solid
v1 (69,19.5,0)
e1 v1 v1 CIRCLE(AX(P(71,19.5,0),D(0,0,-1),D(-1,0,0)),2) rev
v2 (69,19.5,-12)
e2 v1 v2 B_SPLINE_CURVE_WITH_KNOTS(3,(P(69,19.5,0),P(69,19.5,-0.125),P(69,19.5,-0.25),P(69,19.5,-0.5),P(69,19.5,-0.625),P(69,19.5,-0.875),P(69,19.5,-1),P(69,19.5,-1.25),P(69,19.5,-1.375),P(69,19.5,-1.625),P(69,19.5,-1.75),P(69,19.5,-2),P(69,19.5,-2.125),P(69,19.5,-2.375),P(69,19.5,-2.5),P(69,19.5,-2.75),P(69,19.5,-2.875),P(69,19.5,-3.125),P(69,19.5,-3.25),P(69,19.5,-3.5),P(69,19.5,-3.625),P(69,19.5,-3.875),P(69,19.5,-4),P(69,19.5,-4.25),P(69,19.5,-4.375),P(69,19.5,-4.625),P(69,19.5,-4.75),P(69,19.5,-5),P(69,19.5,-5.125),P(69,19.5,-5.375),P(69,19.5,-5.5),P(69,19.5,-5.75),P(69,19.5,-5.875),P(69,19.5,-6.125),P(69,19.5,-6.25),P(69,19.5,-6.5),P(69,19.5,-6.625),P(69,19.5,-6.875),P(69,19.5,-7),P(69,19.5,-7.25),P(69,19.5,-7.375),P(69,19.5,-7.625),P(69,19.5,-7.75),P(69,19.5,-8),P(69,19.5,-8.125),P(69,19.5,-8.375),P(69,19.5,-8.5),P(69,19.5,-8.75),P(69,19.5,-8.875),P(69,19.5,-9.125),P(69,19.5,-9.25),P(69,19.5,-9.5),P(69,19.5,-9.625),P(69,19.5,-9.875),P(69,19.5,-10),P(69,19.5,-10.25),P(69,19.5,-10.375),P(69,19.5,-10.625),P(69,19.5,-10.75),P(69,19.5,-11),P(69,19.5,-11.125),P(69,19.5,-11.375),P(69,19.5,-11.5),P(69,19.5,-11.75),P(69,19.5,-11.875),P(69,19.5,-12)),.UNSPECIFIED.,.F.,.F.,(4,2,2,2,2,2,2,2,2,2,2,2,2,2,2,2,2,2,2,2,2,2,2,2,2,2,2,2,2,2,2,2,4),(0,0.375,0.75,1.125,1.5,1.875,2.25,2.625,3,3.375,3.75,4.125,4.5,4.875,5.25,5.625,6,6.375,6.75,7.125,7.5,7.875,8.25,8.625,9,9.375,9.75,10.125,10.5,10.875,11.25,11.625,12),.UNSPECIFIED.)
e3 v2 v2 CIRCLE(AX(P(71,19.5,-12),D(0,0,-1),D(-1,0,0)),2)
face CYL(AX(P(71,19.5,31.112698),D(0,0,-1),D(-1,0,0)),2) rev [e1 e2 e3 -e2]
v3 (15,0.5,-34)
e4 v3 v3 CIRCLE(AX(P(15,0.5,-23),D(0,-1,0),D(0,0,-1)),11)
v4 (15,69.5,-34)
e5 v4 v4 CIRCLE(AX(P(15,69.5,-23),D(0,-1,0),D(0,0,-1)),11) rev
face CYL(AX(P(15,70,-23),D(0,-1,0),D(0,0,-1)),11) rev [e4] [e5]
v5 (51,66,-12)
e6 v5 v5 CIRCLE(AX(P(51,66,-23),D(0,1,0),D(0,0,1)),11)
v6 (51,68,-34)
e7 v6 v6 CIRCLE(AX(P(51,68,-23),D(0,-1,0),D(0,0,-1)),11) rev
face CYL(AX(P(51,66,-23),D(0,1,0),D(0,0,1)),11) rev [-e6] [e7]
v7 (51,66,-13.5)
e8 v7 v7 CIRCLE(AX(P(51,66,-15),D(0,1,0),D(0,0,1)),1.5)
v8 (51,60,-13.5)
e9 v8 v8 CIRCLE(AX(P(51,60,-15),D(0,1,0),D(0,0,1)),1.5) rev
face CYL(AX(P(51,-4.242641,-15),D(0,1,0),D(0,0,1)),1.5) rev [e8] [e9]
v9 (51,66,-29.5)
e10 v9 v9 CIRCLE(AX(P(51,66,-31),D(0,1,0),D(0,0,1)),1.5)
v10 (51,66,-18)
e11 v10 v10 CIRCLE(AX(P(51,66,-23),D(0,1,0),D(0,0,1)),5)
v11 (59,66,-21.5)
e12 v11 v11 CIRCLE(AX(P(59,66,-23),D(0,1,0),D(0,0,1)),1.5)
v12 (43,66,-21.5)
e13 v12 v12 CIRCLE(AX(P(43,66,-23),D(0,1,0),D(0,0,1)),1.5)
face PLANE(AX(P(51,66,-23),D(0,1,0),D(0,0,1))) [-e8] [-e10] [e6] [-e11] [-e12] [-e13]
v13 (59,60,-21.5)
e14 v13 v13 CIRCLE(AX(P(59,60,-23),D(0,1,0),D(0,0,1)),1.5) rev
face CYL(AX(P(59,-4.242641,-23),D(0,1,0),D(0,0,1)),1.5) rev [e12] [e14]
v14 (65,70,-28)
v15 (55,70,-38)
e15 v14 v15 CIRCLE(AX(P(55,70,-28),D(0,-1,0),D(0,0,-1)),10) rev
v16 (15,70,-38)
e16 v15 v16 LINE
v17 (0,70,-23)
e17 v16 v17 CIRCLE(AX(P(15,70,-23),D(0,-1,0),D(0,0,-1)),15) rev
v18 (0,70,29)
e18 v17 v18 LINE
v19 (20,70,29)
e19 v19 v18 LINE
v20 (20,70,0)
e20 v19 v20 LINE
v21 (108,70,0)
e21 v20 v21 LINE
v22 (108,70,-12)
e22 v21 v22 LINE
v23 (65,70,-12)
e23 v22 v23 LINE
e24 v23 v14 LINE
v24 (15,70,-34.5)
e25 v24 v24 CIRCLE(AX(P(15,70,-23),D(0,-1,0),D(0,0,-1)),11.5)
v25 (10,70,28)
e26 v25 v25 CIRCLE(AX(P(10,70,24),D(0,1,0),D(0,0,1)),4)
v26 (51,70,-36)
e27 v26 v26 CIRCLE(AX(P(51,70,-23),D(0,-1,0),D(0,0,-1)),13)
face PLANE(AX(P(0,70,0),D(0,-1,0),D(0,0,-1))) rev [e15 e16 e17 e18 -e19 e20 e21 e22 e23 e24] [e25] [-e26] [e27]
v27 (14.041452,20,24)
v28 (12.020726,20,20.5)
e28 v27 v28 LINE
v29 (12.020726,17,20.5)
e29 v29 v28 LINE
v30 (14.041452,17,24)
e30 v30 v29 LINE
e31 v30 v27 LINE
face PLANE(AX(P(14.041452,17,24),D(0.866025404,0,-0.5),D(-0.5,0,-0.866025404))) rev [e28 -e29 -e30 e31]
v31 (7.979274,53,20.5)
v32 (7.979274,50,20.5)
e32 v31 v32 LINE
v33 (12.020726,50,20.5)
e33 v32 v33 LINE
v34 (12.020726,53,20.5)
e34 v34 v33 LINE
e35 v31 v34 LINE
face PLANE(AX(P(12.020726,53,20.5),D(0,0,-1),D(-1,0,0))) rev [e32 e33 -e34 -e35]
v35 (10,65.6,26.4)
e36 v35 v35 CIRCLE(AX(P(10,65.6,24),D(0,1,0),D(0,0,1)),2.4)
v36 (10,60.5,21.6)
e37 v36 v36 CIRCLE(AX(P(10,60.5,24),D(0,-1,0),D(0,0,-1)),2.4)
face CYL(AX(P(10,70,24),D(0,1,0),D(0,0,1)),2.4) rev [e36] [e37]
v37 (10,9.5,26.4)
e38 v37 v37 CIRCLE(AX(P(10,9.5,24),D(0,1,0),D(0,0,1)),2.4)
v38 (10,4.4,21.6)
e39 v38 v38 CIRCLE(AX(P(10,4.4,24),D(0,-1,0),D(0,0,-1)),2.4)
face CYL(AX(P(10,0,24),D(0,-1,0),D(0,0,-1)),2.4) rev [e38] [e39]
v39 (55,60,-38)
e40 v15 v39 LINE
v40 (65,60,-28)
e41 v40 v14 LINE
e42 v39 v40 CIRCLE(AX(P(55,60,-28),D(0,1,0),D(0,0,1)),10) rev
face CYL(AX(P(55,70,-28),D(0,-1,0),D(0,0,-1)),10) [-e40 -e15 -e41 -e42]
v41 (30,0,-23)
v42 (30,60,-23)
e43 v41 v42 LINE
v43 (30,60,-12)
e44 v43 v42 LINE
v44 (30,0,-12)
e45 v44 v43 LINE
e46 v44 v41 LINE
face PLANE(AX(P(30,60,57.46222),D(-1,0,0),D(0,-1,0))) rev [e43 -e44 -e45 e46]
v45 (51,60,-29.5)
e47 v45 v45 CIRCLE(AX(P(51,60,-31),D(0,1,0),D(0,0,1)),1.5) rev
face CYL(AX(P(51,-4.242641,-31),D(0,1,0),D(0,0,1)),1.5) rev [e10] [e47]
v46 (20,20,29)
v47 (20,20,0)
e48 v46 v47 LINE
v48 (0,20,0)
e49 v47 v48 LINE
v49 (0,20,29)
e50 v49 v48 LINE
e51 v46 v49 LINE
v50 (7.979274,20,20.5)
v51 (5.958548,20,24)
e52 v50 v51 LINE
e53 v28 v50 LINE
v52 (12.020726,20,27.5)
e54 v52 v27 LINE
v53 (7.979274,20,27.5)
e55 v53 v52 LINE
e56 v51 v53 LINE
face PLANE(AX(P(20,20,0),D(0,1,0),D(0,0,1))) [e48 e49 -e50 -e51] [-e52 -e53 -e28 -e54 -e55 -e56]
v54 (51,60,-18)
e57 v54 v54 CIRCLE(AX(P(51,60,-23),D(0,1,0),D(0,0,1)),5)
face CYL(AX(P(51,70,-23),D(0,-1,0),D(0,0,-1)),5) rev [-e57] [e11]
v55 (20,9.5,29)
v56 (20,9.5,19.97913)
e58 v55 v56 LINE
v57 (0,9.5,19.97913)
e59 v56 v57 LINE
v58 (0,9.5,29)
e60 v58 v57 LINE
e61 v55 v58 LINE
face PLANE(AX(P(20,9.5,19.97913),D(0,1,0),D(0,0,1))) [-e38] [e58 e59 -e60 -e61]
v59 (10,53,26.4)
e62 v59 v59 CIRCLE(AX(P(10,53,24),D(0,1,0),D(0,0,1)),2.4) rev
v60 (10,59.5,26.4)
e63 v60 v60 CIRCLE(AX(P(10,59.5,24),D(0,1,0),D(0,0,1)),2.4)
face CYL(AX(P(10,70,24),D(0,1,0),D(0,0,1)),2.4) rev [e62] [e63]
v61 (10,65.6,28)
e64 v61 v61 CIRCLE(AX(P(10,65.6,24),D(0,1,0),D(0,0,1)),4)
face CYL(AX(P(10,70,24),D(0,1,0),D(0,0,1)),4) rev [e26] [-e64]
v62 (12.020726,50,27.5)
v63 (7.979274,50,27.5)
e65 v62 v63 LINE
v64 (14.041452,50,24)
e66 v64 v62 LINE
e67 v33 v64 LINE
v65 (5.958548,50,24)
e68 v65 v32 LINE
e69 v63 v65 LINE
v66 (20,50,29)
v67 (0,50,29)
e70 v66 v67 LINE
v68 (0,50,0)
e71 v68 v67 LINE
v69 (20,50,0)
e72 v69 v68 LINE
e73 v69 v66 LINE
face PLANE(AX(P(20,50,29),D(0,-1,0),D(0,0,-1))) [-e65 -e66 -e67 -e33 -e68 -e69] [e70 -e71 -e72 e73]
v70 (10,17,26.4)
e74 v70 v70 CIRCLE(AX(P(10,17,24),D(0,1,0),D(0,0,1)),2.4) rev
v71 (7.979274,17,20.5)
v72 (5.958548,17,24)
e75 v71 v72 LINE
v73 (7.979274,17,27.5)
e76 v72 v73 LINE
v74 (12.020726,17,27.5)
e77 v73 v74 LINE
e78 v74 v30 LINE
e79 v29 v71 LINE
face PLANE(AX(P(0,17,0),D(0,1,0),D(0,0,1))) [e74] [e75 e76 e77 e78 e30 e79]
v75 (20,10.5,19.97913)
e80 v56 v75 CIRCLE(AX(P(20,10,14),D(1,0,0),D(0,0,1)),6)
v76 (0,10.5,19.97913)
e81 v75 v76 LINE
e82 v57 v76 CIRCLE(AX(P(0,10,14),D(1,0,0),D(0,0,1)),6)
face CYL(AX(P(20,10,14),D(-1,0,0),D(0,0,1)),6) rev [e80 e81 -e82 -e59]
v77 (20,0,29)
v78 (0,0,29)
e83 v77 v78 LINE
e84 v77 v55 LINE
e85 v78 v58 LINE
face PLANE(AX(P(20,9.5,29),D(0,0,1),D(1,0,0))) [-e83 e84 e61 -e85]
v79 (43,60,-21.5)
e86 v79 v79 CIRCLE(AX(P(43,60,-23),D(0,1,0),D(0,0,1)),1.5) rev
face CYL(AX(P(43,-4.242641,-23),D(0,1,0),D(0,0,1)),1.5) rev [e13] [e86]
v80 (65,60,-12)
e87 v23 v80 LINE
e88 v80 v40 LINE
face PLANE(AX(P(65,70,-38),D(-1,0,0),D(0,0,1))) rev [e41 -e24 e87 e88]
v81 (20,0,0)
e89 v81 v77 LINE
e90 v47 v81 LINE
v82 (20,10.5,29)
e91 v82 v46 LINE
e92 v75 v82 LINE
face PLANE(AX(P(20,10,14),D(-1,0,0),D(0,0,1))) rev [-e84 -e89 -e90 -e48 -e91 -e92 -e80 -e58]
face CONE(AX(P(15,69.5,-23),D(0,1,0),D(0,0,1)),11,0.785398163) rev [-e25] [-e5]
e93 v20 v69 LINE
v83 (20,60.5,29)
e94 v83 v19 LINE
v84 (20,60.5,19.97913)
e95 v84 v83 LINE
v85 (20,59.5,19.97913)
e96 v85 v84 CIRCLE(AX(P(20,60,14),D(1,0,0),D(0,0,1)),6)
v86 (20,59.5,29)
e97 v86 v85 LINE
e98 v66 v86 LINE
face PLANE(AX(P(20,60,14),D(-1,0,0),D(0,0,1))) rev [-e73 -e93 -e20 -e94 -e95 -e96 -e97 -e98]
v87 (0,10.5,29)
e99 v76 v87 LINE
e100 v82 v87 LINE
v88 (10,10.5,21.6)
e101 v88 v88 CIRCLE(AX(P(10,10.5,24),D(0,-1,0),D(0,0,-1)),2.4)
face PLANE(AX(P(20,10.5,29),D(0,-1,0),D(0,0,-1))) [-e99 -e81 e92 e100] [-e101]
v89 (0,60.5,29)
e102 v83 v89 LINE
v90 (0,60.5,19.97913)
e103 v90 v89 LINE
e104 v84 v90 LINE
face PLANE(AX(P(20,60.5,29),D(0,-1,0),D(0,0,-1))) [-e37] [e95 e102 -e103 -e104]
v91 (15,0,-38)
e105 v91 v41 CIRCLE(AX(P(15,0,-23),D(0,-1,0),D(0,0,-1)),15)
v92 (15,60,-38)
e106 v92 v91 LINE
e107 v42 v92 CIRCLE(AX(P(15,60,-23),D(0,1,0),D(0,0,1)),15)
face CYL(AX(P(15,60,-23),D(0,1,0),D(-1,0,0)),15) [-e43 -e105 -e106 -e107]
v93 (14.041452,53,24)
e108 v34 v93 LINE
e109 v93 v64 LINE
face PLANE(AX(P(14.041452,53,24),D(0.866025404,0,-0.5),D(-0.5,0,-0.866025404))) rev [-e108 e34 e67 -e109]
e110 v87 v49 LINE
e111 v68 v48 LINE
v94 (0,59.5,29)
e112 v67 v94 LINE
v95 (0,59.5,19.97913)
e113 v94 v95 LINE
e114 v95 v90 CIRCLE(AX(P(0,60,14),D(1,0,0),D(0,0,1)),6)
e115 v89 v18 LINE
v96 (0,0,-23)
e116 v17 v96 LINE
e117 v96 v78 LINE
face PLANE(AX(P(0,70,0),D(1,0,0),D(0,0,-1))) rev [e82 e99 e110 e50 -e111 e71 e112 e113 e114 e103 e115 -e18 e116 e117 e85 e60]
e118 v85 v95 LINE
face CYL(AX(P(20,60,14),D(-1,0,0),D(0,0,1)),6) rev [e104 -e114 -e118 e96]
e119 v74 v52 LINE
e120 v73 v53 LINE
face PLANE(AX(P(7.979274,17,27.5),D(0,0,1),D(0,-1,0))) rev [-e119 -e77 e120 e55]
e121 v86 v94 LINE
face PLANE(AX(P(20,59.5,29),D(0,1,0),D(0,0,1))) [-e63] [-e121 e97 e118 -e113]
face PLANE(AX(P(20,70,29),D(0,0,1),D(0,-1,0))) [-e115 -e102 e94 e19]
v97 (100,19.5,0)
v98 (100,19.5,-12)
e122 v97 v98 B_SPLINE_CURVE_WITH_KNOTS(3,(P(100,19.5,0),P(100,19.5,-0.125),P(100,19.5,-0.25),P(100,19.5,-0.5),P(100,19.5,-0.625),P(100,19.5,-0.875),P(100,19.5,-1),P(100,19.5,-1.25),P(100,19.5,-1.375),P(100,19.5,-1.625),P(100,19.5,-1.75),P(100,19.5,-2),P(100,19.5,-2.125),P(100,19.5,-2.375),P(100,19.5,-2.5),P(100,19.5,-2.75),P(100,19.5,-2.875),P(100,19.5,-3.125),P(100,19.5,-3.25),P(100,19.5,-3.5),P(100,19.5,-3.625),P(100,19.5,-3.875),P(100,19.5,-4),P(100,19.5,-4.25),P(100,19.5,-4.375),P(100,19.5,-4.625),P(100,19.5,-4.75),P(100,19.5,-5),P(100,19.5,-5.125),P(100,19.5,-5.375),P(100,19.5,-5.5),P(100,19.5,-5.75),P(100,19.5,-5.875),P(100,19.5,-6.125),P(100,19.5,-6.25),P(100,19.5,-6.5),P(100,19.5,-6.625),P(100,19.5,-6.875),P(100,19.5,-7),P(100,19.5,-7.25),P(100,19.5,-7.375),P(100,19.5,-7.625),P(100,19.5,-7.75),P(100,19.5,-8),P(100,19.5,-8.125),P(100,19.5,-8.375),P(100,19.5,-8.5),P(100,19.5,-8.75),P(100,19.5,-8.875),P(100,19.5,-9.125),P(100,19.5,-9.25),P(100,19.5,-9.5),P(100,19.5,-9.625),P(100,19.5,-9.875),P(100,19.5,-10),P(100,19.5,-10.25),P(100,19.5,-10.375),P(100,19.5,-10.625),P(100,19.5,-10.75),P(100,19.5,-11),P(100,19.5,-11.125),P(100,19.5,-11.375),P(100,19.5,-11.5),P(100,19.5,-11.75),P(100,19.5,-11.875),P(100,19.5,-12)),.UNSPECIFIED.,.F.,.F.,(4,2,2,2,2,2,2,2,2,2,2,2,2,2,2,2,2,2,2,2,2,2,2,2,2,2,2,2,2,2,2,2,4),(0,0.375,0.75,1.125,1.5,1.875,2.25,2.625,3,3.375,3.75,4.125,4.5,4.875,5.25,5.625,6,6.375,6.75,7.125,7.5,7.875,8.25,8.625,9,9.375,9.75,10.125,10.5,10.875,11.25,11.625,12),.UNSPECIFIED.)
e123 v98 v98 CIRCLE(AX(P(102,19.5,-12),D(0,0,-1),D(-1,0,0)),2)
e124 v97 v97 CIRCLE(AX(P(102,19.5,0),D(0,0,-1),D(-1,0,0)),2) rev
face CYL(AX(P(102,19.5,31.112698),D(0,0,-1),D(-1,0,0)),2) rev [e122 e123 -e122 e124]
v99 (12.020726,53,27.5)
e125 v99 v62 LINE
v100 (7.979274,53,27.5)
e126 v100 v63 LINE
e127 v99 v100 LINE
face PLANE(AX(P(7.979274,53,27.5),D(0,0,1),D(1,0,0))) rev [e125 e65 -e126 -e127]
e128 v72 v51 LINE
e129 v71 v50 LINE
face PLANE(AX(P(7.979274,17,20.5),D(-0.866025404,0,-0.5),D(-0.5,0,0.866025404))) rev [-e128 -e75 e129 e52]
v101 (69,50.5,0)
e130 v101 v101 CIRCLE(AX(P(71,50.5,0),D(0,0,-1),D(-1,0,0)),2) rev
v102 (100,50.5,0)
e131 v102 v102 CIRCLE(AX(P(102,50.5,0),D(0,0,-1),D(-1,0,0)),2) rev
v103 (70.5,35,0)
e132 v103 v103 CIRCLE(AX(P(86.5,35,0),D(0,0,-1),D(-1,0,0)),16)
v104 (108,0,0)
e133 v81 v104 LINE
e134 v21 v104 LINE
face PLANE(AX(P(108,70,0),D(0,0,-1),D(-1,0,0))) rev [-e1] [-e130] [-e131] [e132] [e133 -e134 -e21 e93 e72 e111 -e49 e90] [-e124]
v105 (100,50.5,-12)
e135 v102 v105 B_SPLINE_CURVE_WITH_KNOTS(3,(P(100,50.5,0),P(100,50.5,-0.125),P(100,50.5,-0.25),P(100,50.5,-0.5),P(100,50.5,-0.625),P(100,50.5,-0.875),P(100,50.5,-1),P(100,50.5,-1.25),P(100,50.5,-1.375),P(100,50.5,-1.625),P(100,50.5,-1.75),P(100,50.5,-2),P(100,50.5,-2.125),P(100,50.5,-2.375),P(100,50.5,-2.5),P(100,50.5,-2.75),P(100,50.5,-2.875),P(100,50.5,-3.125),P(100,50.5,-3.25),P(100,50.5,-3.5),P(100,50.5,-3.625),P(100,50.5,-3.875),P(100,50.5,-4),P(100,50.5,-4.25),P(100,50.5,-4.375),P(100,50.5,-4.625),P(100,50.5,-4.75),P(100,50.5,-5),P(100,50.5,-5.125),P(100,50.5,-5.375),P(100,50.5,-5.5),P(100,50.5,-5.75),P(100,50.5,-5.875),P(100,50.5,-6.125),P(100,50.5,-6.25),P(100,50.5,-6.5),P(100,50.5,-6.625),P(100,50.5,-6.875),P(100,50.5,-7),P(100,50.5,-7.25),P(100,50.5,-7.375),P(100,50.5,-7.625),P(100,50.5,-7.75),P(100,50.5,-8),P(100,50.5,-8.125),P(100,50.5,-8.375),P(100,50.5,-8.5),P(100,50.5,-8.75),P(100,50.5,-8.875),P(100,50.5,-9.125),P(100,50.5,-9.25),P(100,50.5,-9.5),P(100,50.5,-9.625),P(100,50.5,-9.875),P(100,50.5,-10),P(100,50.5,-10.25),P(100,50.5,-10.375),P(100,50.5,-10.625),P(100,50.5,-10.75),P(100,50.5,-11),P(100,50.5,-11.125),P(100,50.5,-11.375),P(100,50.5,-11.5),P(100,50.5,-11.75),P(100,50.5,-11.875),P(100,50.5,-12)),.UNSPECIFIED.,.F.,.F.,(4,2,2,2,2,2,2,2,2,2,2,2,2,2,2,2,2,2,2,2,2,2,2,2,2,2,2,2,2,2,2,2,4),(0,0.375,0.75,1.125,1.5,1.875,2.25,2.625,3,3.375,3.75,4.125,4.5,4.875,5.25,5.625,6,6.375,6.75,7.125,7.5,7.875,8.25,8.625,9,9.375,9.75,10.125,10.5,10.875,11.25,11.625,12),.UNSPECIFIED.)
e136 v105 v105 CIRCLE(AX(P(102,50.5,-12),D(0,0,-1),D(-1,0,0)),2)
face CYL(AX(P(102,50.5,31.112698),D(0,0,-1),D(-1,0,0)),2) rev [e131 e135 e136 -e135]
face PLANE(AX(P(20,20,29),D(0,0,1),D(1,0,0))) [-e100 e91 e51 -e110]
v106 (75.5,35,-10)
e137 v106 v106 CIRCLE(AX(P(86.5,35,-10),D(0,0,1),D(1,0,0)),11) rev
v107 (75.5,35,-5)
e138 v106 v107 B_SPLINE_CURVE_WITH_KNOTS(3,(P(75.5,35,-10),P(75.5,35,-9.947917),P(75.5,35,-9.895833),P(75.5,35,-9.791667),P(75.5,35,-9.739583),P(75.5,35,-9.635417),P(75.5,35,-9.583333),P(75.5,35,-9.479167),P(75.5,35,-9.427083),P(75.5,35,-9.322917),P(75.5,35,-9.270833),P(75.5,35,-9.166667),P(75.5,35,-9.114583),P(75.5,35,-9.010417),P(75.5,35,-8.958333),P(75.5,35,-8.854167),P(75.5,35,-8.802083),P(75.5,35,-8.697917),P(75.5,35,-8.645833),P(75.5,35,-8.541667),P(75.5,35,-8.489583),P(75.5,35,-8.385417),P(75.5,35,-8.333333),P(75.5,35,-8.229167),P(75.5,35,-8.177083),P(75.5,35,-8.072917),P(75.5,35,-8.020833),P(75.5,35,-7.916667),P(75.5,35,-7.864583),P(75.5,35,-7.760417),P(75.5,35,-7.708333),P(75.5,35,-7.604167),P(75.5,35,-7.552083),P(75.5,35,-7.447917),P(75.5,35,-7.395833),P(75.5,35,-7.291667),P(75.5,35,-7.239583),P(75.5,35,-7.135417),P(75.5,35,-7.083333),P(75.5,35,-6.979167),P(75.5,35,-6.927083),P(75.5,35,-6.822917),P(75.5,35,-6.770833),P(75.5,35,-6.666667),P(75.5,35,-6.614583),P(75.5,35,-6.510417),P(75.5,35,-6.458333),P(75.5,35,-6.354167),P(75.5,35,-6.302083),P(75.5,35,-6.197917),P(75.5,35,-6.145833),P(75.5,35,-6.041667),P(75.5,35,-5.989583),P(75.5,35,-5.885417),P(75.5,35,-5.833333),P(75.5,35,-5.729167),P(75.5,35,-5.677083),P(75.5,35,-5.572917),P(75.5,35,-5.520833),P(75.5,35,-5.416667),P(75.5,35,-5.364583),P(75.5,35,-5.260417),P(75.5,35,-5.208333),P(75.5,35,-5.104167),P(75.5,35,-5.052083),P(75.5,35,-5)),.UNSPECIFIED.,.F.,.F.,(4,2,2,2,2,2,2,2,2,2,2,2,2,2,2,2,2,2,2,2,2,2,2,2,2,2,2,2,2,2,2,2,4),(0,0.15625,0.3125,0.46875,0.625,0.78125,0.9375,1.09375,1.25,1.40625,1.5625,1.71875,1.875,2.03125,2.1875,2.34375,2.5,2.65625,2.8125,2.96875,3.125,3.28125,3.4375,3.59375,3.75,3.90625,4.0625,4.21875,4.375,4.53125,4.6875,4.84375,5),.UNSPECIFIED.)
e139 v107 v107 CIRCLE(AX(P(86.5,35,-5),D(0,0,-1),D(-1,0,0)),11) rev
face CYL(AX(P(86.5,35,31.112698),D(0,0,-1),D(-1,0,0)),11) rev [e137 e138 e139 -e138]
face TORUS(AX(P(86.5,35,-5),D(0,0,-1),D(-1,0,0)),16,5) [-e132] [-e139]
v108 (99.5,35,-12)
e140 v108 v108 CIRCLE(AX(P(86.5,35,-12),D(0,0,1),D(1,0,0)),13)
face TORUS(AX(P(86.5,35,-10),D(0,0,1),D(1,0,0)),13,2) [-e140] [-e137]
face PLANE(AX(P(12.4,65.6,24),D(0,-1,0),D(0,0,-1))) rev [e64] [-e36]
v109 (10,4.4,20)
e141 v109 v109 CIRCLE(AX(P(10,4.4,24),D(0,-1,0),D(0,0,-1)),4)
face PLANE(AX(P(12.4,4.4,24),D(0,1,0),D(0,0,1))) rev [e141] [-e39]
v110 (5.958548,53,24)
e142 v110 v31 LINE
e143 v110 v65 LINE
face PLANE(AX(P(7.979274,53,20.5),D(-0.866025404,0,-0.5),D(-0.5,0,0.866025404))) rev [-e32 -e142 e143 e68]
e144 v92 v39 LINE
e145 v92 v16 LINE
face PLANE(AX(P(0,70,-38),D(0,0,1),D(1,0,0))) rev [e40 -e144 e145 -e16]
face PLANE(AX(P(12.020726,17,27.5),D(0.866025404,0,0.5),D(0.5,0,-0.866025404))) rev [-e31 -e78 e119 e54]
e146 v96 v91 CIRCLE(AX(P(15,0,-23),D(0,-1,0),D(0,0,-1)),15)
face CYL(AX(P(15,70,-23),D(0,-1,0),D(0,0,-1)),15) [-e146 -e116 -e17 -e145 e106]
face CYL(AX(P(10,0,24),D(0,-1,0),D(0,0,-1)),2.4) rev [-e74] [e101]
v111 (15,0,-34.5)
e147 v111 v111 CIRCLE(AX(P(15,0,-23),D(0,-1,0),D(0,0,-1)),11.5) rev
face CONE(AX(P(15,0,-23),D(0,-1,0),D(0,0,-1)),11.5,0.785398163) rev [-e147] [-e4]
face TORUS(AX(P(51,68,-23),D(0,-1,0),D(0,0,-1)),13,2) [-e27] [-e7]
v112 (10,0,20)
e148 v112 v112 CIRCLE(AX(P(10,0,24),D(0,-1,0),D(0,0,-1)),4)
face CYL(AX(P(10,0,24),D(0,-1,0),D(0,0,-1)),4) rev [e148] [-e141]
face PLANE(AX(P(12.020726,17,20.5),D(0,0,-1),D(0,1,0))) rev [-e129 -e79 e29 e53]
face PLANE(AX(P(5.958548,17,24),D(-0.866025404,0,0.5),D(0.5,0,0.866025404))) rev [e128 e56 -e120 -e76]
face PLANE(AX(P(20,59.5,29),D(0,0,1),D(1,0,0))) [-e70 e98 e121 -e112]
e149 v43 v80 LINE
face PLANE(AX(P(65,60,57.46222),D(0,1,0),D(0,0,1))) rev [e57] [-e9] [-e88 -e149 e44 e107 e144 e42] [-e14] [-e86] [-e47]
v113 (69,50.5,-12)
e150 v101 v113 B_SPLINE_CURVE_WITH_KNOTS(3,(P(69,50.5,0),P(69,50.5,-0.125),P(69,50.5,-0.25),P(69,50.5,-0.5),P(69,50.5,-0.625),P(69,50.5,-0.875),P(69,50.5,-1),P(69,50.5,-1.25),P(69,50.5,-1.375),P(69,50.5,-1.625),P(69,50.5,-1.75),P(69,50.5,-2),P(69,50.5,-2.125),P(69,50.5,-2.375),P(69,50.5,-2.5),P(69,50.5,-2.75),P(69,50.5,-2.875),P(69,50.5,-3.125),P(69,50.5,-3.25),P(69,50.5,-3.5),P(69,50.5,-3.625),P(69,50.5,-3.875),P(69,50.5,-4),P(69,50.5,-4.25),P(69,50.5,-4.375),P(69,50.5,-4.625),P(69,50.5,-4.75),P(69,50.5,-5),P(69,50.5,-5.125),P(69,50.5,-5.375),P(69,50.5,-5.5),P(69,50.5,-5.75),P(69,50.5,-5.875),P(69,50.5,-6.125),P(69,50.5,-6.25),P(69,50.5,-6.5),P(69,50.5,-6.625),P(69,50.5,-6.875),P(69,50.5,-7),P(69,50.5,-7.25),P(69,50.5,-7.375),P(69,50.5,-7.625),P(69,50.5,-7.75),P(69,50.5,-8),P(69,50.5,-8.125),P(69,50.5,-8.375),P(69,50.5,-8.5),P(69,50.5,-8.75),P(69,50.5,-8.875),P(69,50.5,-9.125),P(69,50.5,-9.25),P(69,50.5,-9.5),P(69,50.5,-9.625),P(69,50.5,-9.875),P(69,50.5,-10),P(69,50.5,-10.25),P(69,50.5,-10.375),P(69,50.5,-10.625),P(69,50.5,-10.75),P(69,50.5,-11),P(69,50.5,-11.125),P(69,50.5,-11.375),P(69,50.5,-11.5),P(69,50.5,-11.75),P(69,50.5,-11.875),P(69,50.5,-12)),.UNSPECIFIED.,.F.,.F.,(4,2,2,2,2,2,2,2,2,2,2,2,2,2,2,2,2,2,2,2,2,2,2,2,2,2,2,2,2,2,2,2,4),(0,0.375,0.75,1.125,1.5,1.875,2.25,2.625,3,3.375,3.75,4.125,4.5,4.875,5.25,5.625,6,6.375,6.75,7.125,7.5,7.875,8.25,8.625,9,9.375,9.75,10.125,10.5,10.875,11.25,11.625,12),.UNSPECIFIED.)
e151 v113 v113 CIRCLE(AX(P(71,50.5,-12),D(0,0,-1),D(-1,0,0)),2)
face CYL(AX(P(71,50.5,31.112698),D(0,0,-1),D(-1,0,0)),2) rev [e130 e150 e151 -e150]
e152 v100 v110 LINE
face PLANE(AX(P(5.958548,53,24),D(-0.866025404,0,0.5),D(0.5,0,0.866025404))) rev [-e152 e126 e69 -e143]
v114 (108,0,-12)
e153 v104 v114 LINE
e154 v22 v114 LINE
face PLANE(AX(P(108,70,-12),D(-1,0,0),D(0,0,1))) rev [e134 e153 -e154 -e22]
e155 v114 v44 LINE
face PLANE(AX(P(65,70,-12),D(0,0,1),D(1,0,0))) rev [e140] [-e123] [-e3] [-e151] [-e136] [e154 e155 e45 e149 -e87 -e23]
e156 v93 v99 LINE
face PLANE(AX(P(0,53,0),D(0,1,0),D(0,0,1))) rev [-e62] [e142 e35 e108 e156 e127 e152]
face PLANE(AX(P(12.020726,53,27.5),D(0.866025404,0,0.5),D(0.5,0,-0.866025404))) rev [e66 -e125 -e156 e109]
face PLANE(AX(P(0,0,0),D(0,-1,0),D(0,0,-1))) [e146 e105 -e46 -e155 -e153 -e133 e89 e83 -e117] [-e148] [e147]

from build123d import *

# Parameters (mm, degrees)
SKETCH_1_R                    = 5
SKETCH_1_R_2                  = 11
EXTRUDE_1_DEPTH               = 70
EXTRUDE_3_DEPTH               = 20
SKETCH_5_R                    = 11
SKETCH_5_R_2                  = 2
CUT_EXTRUDE_3_DEPTH           = 12
FILLET_2_R                    = 5
FILLET_1_R                    = 2
SKETCH_18_R                   = 11
CUT_EXTRUDE_8_DEPTH           = 4
SKETCH_20_R                   = 1.5
CUT_EXTRUDE_9_DEPTH           = 66
FILLET_4_R                    = 2
CHAMFER_1_SIZE                = 0.5
CHAMFER_2_SIZE                = 0.5
HOLE_START                    = 50
HOLE_WIZARD_M41_OUTLINE_R     = 2.4
HOLE_WIZARD_M41_DEPTH         = 20
HOLE_START_2                  = 65.6
HOLE_WIZARD_M41_2_OUTLINE_R   = 4
HOLE_WIZARD_M41_2_OUTLINE_R_2 = 2.4
HOLE_WIZARD_M41_2_DEPTH       = 4.4
HOLE_WIZARD_M42_D             = 4.8
HOLE_WIZARD_M42_CBORE_D       = 8
HOLE_WIZARD_M42_CBORE_DEPTH   = 4.4
CUT_EXTRUDE_11_DEPTH          = 3
CUT_EXTRUDE_12_DEPTH          = 3
CUT_EXTRUDE_14_REACH          = 147.097
SKETCH_35_W                   = 35
SKETCH_35_H                   = 60
FILLET_6_R                    = 10
FILLET_7_R                    = 15
FILLET_8_R                    = 15


# Read off the part's stored shape, not the designer's step: Цековка для  винта с внутренним шестигранником M41
with BuildPart() as part:
    # Эскиз1 → Бобышка-Вытянуть1 (new body)
    with BuildSketch(Plane(origin=(0, 0, 0), x_dir=(1, 0, 0), z_dir=(0, 1, 0))):
        Polygon((0, 0), (0, 38), (65, 38), (65, 12), (108, 12), (108, 0), align=None)
        with Locations(Location((51, 23, 0), (0, 0, 270))):
            Circle(SKETCH_1_R, mode=Mode.SUBTRACT)
        with Locations(Location((15, 23, 0), (0, 0, 270))):
            Circle(SKETCH_1_R_2, mode=Mode.SUBTRACT)
    extrude(amount=EXTRUDE_1_DEPTH)

    # Эскиз3 → Бобышка-Вытянуть3 (add)
    with BuildSketch(Plane.ZY):
        with BuildLine():
            Line((0, 70), (29, 70))
            Line((29, 70), (29, 60.5))
            Line((29, 60.5), (19.979130372, 60.5))
            ThreePointArc((19.979130372, 60.5), (8, 60), (19.979130372, 59.5))
            Line((19.979130372, 59.5), (29, 59.5))
            Line((29, 59.5), (29, 50))
            Line((29, 50), (0, 50))
            Line((0, 50), (0, 70))
        make_face()
        with BuildLine():
            Line((29, 0), (0, 0))
            Line((0, 0), (0, 20))
            Line((0, 20), (29, 20))
            Line((29, 20), (29, 10.5))
            Line((29, 10.5), (19.979130372, 10.5))
            ThreePointArc((19.979130372, 10.5), (8, 10), (19.979130372, 9.5))
            Line((19.979130372, 9.5), (29, 9.5))
            Line((29, 9.5), (29, 0))
        make_face()
    extrude(amount=-EXTRUDE_3_DEPTH)

    # Эскиз5 → Вырез-Вытянуть3 (cut)
    with BuildSketch(Plane(origin=(0, 0, -12), x_dir=(-1, 0, 0), z_dir=(0, 0, -1))):
        with Locations((-86.5, 35)):
            Circle(SKETCH_5_R)
        with Locations((-102, 19.5)):
            Circle(SKETCH_5_R_2)
        with Locations((-71, 19.5)):
            Circle(SKETCH_5_R_2)
        with Locations((-71, 50.5)):
            Circle(SKETCH_5_R_2)
        with Locations((-102, 50.5)):
            Circle(SKETCH_5_R_2)
    extrude(amount=-CUT_EXTRUDE_3_DEPTH, mode=Mode.SUBTRACT)

    # Скругление2
    fillet_2_edges = [part.edges().sort_by_distance(p)[0] for p in [
        (97.5, 35, 0),
    ]]
    fillet(fillet_2_edges, radius=FILLET_2_R)

    # Скругление1
    fillet_1_edges = [part.edges().sort_by_distance(p)[0] for p in [
        (97.5, 35, -12),
    ]]
    fillet(fillet_1_edges, radius=FILLET_1_R)

    # Эскиз18 → Вырез-Вытянуть8 (cut)
    with BuildSketch(Plane(origin=(0, 70, 0), x_dir=(1, 0, 0), z_dir=(0, 1, 0))):
        with Locations(Location((51, 23, 0), (0, 0, 270))):
            Circle(SKETCH_18_R)
    extrude(amount=-CUT_EXTRUDE_8_DEPTH, mode=Mode.SUBTRACT)

    # Эскиз20 → Вырез-Вытянуть9 (cut)
    with BuildSketch(Plane(origin=(0, 66, 0), x_dir=(1, 0, 0), z_dir=(0, 1, 0))):
        with Locations(Location((43, 23, 0), (0, 0, 270))):
            Circle(SKETCH_20_R)
        with Locations(Location((59, 23, 0), (0, 0, 270))):
            Circle(SKETCH_20_R)
        with Locations(Location((51, 31, 0), (0, 0, 270))):
            Circle(SKETCH_20_R)
        with Locations(Location((51, 15, 0), (0, 0, 270))):
            Circle(SKETCH_20_R)
    extrude(amount=-CUT_EXTRUDE_9_DEPTH, mode=Mode.SUBTRACT)

    # Скругление4
    fillet_4_edges = [part.edges().sort_by_distance(p)[0] for p in [
        (51, 70, -34),
    ]]
    fillet(fillet_4_edges, radius=FILLET_4_R)

    # Фаска1
    chamfer_1_edges = [part.edges().sort_by_distance(p)[0] for p in [
        (15, 70, -34),
    ]]
    chamfer(chamfer_1_edges, length=CHAMFER_1_SIZE)

    # Фаска2
    chamfer_2_edges = [part.edges().sort_by_distance(p)[0] for p in [
        (15, 0, -34),
    ]]
    chamfer(chamfer_2_edges, length=CHAMFER_2_SIZE)

    # Цековка для  винта с внутренним шестигранником M41 outline → Цековка для  винта с внутренним шестигранником M41 (cut)
    with BuildSketch(Plane(origin=(0, 0, 0), x_dir=(1, 0, 0), z_dir=(0, 1, 0)).offset(HOLE_START)):
        with Locations((10, -24)):
            Circle(HOLE_WIZARD_M41_OUTLINE_R)
    extrude(amount=HOLE_WIZARD_M41_DEPTH, mode=Mode.SUBTRACT)

    # Hole Wizard M41 2 outline → Hole Wizard M41 2 (cut)
    with BuildSketch(Plane(origin=(0, 0, 0), x_dir=(1, 0, 0), z_dir=(0, 1, 0)).offset(HOLE_START_2)):
        with Locations((10, -24)):
            Circle(HOLE_WIZARD_M41_2_OUTLINE_R)
        with Locations((10, -24)):
            Circle(HOLE_WIZARD_M41_2_OUTLINE_R_2, mode=Mode.SUBTRACT)
    extrude(amount=HOLE_WIZARD_M41_2_DEPTH, mode=Mode.SUBTRACT)

    # Цековка для  винта с внутренним шестигранником M42 (through all)
    with Locations(Plane(origin=(0, 0, 0), x_dir=(-1, 0, 0), z_dir=(0, -1, 0))):
        with Locations((-10, -24)):
            CounterBoreHole(HOLE_WIZARD_M42_D / 2, HOLE_WIZARD_M42_CBORE_D / 2, HOLE_WIZARD_M42_CBORE_DEPTH)

    # Эскиз29 → Вырез-Вытянуть11 (cut)
    with BuildSketch(Plane(origin=(0, 20, 0), x_dir=(1, 0, 0), z_dir=(0, 1, 0))):
        Polygon((7.979274058, -27.5), (12.020725942, -27.5), (14.041451884, -24), (12.020725942, -20.5), (7.979274058, -20.5), (5.958548116, -24), align=None)
    extrude(amount=-CUT_EXTRUDE_11_DEPTH, mode=Mode.SUBTRACT)

    # Эскиз34 → Вырез-Вытянуть12 (cut)
    with BuildSketch(Plane(origin=(0, 50, 0), x_dir=(-1, 0, 0), z_dir=(0, -1, 0))):
        Polygon((-7.979274058, -27.5), (-12.020725942, -27.5), (-14.041451884, -24), (-12.020725942, -20.5), (-7.979274058, -20.5), (-5.958548116, -24), align=None)
    extrude(amount=-CUT_EXTRUDE_12_DEPTH, mode=Mode.SUBTRACT)

    # Вырез-Вытянуть14: up to this face of the body (flat: up to its plane)
    cut_extrude_14_end = Plane(part.part.faces().sort_by_distance((100.321522976, 35, -12))[0])
    # Эскиз35 → Вырез-Вытянуть14 (cut, up to the picked face)
    with BuildSketch(Plane(origin=(0, 0, -38), x_dir=(-1, 0, 0), z_dir=(0, 0, -1)), mode=Mode.PRIVATE) as cut_extrude_14_sk1:
        with Locations((-47.5, 30)):
            Rectangle(SKETCH_35_W, SKETCH_35_H)
    cut_extrude_14_tool1 = split(extrude(cut_extrude_14_sk1.sketch, amount=-CUT_EXTRUDE_14_REACH, mode=Mode.PRIVATE), bisect_by=cut_extrude_14_end, keep=Keep.BOTH, mode=Mode.PRIVATE)
    add(cut_extrude_14_tool1.solids().sort_by(Axis((47.5, 30, -38), (0, 0, 1)))[0], mode=Mode.SUBTRACT)

    # Скругление6
    fillet_6_edges = [part.edges().sort_by_distance(p)[0] for p in [
        (65, 65, -38),
    ]]
    fillet(fillet_6_edges, radius=FILLET_6_R)

    # Скругление7
    fillet_7_edges = [part.edges().sort_by_distance(p)[0] for p in [
        (30, 30, -38),
    ]]
    fillet(fillet_7_edges, radius=FILLET_7_R)

    # Скругление8
    fillet_8_edges = [part.edges().sort_by_distance(p)[0] for p in [
        (0, 35, -38),
    ]]
    fillet(fillet_8_edges, radius=FILLET_8_R - 0.0001)  # a hair under: the kernel refuses the full size


solid = part.part
